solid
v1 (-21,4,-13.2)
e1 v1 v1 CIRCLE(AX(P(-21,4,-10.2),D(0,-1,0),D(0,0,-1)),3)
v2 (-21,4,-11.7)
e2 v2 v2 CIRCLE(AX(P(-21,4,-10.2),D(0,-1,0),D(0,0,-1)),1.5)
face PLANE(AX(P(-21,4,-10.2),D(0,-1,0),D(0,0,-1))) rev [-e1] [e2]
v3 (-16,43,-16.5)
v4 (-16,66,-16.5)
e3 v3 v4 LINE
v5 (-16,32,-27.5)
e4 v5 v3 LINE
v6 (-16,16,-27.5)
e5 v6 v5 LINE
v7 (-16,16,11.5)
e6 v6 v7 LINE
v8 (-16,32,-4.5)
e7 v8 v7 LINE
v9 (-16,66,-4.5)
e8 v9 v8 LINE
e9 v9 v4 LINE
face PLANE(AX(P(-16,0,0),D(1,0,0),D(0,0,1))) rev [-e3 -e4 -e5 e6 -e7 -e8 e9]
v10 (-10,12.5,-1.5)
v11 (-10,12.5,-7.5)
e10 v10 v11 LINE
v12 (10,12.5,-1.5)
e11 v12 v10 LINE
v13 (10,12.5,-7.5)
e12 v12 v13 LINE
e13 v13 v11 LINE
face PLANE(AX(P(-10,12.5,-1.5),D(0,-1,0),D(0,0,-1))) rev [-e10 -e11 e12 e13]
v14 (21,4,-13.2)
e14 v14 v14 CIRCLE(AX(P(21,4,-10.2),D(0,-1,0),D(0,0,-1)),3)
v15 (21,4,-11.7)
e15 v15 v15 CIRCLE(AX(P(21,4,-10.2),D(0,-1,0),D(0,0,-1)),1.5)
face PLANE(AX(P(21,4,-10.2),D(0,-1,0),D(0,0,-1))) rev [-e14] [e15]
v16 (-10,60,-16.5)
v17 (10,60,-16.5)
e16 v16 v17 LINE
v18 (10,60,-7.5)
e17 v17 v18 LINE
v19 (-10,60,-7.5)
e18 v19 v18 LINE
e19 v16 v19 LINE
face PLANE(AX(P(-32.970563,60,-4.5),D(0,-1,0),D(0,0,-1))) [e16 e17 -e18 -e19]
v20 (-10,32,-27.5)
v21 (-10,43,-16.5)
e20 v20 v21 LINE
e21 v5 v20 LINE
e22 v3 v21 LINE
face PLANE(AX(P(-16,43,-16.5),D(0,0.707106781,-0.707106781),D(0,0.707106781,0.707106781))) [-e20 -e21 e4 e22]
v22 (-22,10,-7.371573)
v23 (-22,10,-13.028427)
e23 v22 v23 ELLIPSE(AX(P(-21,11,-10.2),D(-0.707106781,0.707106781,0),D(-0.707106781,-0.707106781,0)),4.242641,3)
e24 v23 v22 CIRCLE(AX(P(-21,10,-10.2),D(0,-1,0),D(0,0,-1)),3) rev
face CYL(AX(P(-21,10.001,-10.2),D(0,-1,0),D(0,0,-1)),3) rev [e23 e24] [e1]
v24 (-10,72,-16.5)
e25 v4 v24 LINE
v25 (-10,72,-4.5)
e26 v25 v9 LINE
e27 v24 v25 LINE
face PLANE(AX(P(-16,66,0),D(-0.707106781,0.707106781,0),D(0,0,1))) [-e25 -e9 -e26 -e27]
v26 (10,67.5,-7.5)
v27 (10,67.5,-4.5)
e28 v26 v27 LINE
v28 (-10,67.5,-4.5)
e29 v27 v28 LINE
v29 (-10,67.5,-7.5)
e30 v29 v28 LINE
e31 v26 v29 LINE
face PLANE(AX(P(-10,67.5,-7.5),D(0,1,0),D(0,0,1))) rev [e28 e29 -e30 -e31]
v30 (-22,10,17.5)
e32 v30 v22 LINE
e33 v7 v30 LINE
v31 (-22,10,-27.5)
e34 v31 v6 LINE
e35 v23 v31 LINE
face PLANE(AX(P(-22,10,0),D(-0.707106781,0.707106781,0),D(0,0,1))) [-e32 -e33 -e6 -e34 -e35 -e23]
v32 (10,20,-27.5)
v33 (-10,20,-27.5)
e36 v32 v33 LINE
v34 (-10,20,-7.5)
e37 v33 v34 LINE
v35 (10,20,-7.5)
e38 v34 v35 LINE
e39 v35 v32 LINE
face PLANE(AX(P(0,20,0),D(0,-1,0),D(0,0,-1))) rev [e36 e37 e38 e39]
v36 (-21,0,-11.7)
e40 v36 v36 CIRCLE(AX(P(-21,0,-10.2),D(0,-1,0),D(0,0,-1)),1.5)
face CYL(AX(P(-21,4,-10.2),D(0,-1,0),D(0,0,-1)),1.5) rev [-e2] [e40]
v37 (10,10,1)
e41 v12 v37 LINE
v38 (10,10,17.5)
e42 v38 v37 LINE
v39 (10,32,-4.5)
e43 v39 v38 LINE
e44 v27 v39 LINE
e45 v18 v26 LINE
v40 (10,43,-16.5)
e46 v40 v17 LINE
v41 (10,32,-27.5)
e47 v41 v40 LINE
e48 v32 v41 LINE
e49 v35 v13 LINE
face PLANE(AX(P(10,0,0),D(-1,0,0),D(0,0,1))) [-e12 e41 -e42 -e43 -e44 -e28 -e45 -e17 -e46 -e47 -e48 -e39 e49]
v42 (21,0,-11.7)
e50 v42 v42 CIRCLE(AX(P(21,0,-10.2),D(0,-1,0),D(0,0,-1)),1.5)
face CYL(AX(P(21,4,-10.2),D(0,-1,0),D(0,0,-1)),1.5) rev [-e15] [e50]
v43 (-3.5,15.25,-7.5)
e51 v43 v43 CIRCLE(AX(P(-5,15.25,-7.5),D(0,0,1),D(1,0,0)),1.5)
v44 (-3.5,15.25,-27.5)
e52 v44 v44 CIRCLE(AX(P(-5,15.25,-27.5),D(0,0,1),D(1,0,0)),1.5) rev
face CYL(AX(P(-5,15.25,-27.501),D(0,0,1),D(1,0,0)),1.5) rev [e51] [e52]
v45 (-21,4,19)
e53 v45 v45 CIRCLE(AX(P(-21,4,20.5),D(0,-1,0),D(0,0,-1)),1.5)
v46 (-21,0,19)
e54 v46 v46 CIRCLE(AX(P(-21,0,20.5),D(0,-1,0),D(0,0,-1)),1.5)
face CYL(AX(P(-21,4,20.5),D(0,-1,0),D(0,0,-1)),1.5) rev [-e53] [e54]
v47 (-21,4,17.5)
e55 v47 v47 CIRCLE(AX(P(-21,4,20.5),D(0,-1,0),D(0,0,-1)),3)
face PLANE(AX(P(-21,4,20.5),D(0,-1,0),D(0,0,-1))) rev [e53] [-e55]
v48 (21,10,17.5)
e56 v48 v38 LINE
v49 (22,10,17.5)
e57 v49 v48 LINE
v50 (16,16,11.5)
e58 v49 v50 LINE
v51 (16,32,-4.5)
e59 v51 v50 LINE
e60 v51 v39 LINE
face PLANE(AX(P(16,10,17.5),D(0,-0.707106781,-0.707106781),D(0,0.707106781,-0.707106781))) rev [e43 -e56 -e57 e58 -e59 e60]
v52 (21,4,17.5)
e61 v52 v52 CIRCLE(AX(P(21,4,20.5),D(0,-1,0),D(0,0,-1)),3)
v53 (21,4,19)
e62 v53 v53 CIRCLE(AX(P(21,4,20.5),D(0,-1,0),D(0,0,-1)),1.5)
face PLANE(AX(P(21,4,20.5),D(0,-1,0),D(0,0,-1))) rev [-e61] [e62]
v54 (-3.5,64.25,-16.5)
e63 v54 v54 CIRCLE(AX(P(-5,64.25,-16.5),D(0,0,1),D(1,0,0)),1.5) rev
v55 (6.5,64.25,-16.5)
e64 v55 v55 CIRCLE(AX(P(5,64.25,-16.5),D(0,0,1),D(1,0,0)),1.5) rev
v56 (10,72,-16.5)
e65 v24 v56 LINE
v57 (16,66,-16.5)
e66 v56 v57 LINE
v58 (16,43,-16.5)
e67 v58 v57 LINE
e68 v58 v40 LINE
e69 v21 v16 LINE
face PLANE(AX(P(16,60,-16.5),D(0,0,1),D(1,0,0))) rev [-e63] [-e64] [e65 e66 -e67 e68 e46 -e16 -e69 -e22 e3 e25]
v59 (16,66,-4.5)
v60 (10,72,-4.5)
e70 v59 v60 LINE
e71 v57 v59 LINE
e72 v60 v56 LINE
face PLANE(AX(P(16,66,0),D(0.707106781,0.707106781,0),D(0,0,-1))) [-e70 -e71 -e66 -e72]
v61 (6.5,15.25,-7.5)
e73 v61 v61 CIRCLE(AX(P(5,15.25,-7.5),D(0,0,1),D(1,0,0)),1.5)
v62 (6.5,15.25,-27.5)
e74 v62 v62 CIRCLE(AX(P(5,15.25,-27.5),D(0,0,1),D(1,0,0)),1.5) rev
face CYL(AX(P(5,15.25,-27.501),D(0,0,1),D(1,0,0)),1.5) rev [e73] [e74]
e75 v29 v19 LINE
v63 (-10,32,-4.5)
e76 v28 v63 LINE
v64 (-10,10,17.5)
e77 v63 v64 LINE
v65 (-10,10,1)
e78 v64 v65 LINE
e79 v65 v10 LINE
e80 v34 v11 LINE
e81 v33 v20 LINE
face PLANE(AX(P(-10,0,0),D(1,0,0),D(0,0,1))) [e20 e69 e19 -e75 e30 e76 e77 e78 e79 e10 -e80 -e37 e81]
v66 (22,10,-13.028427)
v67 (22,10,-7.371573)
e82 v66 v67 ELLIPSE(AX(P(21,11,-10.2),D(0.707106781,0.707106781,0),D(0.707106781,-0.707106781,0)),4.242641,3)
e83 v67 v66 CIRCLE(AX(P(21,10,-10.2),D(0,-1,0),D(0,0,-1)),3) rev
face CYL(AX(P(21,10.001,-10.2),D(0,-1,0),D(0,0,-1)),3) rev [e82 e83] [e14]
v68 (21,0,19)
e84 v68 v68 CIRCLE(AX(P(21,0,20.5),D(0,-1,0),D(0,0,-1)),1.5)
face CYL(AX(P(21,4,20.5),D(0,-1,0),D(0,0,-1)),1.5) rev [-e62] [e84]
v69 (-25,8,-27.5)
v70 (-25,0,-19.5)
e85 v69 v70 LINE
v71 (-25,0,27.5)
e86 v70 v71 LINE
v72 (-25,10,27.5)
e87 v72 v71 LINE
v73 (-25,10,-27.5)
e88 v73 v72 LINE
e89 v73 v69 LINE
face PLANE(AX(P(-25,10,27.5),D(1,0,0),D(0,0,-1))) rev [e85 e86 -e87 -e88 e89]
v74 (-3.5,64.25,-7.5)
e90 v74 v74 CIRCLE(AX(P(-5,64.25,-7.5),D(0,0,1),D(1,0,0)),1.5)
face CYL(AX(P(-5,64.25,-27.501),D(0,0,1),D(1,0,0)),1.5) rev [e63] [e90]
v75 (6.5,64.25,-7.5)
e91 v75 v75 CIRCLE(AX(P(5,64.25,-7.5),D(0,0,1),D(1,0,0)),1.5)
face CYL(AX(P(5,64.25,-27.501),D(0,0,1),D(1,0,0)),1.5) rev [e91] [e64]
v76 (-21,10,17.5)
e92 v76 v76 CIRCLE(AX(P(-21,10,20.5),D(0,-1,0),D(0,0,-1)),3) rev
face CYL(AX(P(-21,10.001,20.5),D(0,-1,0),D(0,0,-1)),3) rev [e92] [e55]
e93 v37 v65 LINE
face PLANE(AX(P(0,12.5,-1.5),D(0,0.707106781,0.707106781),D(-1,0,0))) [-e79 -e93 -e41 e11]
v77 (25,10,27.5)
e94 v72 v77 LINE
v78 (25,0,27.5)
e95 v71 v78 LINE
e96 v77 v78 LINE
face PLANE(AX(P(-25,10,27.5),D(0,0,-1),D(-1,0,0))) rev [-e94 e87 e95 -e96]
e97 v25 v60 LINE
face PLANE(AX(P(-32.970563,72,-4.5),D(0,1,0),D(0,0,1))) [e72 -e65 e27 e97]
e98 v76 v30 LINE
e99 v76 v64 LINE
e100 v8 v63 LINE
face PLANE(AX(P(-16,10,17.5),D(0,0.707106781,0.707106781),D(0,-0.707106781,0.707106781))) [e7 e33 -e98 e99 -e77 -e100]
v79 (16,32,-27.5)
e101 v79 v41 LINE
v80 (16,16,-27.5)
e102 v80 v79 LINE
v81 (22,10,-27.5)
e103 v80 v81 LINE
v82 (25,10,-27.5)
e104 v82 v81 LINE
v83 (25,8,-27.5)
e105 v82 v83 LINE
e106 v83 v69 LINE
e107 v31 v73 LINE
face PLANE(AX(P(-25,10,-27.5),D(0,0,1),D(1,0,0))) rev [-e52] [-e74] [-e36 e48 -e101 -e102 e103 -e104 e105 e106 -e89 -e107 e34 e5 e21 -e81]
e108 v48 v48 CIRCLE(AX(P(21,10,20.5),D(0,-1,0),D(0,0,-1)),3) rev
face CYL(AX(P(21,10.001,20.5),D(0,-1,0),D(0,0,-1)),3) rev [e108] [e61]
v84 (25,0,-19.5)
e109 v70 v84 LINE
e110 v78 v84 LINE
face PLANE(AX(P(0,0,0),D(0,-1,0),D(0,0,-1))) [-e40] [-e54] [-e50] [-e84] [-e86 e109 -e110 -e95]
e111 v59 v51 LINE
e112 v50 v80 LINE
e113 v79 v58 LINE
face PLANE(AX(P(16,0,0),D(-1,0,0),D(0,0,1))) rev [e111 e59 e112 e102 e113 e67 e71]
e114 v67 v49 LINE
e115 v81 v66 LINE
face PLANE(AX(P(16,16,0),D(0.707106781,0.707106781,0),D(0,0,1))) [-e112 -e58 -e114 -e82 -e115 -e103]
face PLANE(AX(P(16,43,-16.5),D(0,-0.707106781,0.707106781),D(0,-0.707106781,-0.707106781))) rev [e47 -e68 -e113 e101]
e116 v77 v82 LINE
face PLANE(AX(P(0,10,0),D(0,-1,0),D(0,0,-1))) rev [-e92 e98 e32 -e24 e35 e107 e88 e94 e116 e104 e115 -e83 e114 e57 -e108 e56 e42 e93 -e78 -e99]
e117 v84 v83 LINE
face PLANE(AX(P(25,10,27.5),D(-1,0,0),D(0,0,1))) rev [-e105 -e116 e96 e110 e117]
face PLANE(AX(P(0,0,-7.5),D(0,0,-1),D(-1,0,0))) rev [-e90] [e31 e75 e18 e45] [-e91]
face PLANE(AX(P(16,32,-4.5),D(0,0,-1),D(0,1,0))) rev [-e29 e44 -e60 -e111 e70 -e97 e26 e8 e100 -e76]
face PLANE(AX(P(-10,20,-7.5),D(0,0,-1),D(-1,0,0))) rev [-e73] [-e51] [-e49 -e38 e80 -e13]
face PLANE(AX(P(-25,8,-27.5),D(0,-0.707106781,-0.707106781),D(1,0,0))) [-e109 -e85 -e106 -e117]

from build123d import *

# Parameters (mm, degrees)
SKETCH1_W           = 50
SKETCH1_H           = 55
BOSS_EXTRUDE1_DEPTH = 10
SKETCH2_R           = 1.5
CUT_EXTRUDE1_DEPTH  = 4
CUT_EXTRUDE2_REACH  = 39.646
SKETCH3_R           = 3
SKETCH4_W           = 20
SKETCH4_H           = 20
BOSS_EXTRUDE2_DEPTH = 10
BOSS_EXTRUDE3_DEPTH = 6
SKETCH6_W           = 12
SKETCH6_H           = 12
BOSS_EXTRUDE4_DEPTH = 32
SKETCH7_W           = 20
SKETCH7_H           = 2.5
BOSS_EXTRUDE5_DEPTH = 6
SKETCH8_W           = 20
SKETCH8_H           = 7.5
CUT_EXTRUDE3_DEPTH  = 3
CHAMFER1_SIZE       = 2.5
CUT_EXTRUDE4_REACH  = 85.869
SKETCH9_R           = 1.5
CHAMFER3_SIZE       = 6
CHAMFER4_SIZE       = 8


# Some blends are built 0.0001 mm under size
with BuildPart() as part:
    # Sketch1 → Boss-Extrude1 (new body)
    with BuildSketch(Plane(origin=(0, 0, 0), x_dir=(1, 0, 0), z_dir=(0, 1, 0))):
        Rectangle(SKETCH1_W, SKETCH1_H)
    extrude(amount=BOSS_EXTRUDE1_DEPTH)

    # Sketch2 → Cut-Extrude1 (cut)
    with BuildSketch(Plane.XZ):
        with Locations(Location((-21, 20.5, 0), (0, 0, 270))):
            Circle(SKETCH2_R)
        with Locations(Location((21, 20.5, 0), (0, 0, 270))):
            Circle(SKETCH2_R)
        with Locations(Location((21, -10.2, 0), (0, 0, 270))):
            Circle(SKETCH2_R)
        with Locations(Location((-21, -10.2, 0), (0, 0, 270))):
            Circle(SKETCH2_R)
    extrude(amount=-CUT_EXTRUDE1_DEPTH, mode=Mode.SUBTRACT)

    # Sketch3 → Cut-Extrude2 (cut, up to next)
    with BuildSketch(Plane.XZ.offset(-4), mode=Mode.PRIVATE) as cut_extrude2_sk1:
        with Locations(Location((-21, 20.5, 0), (0, 0, 270))):
            Circle(SKETCH3_R)
    cut_extrude2_tool1 = extrude(cut_extrude2_sk1.sketch, amount=-CUT_EXTRUDE2_REACH, mode=Mode.PRIVATE) & part.part
    # Sketch3 → Cut-Extrude2 (cut, up to next)
    with BuildSketch(Plane.XZ.offset(-4), mode=Mode.PRIVATE) as cut_extrude2_sk2:
        with Locations(Location((21, 20.5, 0), (0, 0, 270))):
            Circle(SKETCH3_R)
    cut_extrude2_tool2 = extrude(cut_extrude2_sk2.sketch, amount=-CUT_EXTRUDE2_REACH, mode=Mode.PRIVATE) & part.part
    # Sketch3 → Cut-Extrude2 (cut, up to next)
    with BuildSketch(Plane.XZ.offset(-4), mode=Mode.PRIVATE) as cut_extrude2_sk3:
        with Locations(Location((21, -10.2, 0), (0, 0, 270))):
            Circle(SKETCH3_R)
    cut_extrude2_tool3 = extrude(cut_extrude2_sk3.sketch, amount=-CUT_EXTRUDE2_REACH, mode=Mode.PRIVATE) & part.part
    # Sketch3 → Cut-Extrude2 (cut, up to next)
    with BuildSketch(Plane.XZ.offset(-4), mode=Mode.PRIVATE) as cut_extrude2_sk4:
        with Locations(Location((-21, -10.2, 0), (0, 0, 270))):
            Circle(SKETCH3_R)
    cut_extrude2_tool4 = extrude(cut_extrude2_sk4.sketch, amount=-CUT_EXTRUDE2_REACH, mode=Mode.PRIVATE) & part.part
    add(cut_extrude2_tool1.solids().sort_by_distance((-21, 4, 20.5))[0], mode=Mode.SUBTRACT)
    add(cut_extrude2_tool2.solids().sort_by_distance((21, 4, 20.5))[0], mode=Mode.SUBTRACT)
    add(cut_extrude2_tool3.solids().sort_by_distance((21, 4, -10.2))[0], mode=Mode.SUBTRACT)
    add(cut_extrude2_tool4.solids().sort_by_distance((-21, 4, -10.2))[0], mode=Mode.SUBTRACT)

    # Sketch4 → Boss-Extrude2 (add)
    with BuildSketch(Plane(origin=(0, 10, 0), x_dir=(1, 0, 0), z_dir=(0, 1, 0))):
        with Locations((0, 17.5)):
            Rectangle(SKETCH4_W, SKETCH4_H)
    extrude(amount=BOSS_EXTRUDE2_DEPTH)

    # Sketch5 → Boss-Extrude3 (add)
    with BuildSketch(Plane(origin=(10, 0, 0), x_dir=(0, 0, -1), z_dir=(1, 0, 0))):
        Polygon((-17.5, 10), (4.5, 32), (4.5, 60), (16.5, 60), (16.5, 43), (27.5, 32), (27.5, 10), align=None)
    boss_extrude3 = extrude(amount=BOSS_EXTRUDE3_DEPTH)

    # Mirror1: Boss-Extrude3 across plane
    add(boss_extrude3.mirror(Plane(origin=(0, 0, 0), x_dir=(0, 0, 1), z_dir=(1, 0, 0))))

    # Sketch6 → Boss-Extrude4 (add)
    with BuildSketch(Plane(origin=(16, 0, 0), x_dir=(0, 0, -1), z_dir=(1, 0, 0))):
        with Locations((10.5, 66)):
            Rectangle(SKETCH6_W, SKETCH6_H)
    extrude(amount=-BOSS_EXTRUDE4_DEPTH)

    # Sketch7 → Boss-Extrude5 (add)
    with BuildSketch(Plane.XY.offset(-7.5)):
        with Locations((0, 11.25)):
            Rectangle(SKETCH7_W, SKETCH7_H)
    extrude(amount=BOSS_EXTRUDE5_DEPTH)

    # Sketch8 → Cut-Extrude3 (cut)
    with BuildSketch(Plane.XY.offset(-4.5)):
        with Locations((0, 63.75)):
            Rectangle(SKETCH8_W, SKETCH8_H)
    extrude(amount=-CUT_EXTRUDE3_DEPTH, mode=Mode.SUBTRACT)

    # Chamfer1
    chamfer1_edges = [part.edges().sort_by_distance(p)[0] for p in [
        (0, 10, -1.5),
    ]]
    chamfer(chamfer1_edges, length=CHAMFER1_SIZE - 0.0001)  # a hair under: the kernel refuses the full size

    # Sketch9 → Cut-Extrude4 (cut, up to next)
    with BuildSketch(Plane.XY.offset(-7.5), mode=Mode.PRIVATE) as cut_extrude4_sk1:
        with Locations((-5, 64.25)):
            Circle(SKETCH9_R)
    cut_extrude4_tool1 = extrude(cut_extrude4_sk1.sketch, amount=-CUT_EXTRUDE4_REACH, mode=Mode.PRIVATE) & part.part
    # Sketch9 → Cut-Extrude4 (cut, up to next)
    with BuildSketch(Plane.XY.offset(-7.5), mode=Mode.PRIVATE) as cut_extrude4_sk2:
        with Locations((5, 64.25)):
            Circle(SKETCH9_R)
    cut_extrude4_tool2 = extrude(cut_extrude4_sk2.sketch, amount=-CUT_EXTRUDE4_REACH, mode=Mode.PRIVATE) & part.part
    # Sketch9 → Cut-Extrude4 (cut, up to next)
    with BuildSketch(Plane.XY.offset(-7.5), mode=Mode.PRIVATE) as cut_extrude4_sk3:
        with Locations((5, 15.25)):
            Circle(SKETCH9_R)
    cut_extrude4_tool3 = extrude(cut_extrude4_sk3.sketch, amount=-CUT_EXTRUDE4_REACH, mode=Mode.PRIVATE) & part.part
    # Sketch9 → Cut-Extrude4 (cut, up to next)
    with BuildSketch(Plane.XY.offset(-7.5), mode=Mode.PRIVATE) as cut_extrude4_sk4:
        with Locations((-5, 15.25)):
            Circle(SKETCH9_R)
    cut_extrude4_tool4 = extrude(cut_extrude4_sk4.sketch, amount=-CUT_EXTRUDE4_REACH, mode=Mode.PRIVATE) & part.part
    add(cut_extrude4_tool1.solids().sort_by_distance((-5, 64.25, -7.5))[0], mode=Mode.SUBTRACT)
    add(cut_extrude4_tool2.solids().sort_by_distance((5, 64.25, -7.5))[0], mode=Mode.SUBTRACT)
    add(cut_extrude4_tool3.solids().sort_by_distance((5, 15.25, -7.5))[0], mode=Mode.SUBTRACT)
    add(cut_extrude4_tool4.solids().sort_by_distance((-5, 15.25, -7.5))[0], mode=Mode.SUBTRACT)

    # Chamfer3
    # the kernel refuses this chamfer: 6 mm, written as the material it adds along each edge
    with BuildSketch(Plane(origin=(16, 10, -27.5), x_dir=(0.9996219169112969, -0.02749587661058649, 0), z_dir=(0, 0, 1))) as chamfer3_piece_1_section:
        Polygon((CHAMFER3_SIZE * 0.999621916911, CHAMFER3_SIZE * 0.0274958766106), (-CHAMFER3_SIZE * 0.0274958766106, CHAMFER3_SIZE * 0.999621916911), (0, 0), align=None)
    chamfer3_piece_1 = extrude(amount=60.430097928, mode=Mode.PRIVATE)
    chamfer3_piece_1 = split(chamfer3_piece_1, bisect_by=Plane(origin=(17.926096491, 22.613963147, 4.886036853), z_dir=(0, -0.7071067811865474, -0.7071067811865478)), keep=Keep.TOP, mode=Mode.PRIVATE)
    chamfer3_piece_1 = chamfer3_piece_1 - Plane(origin=(21, 11.966350777, 20.5), x_dir=(0, 0, -1), z_dir=(0, -1, 0)) * Cylinder(3, 145, mode=Mode.PRIVATE)
    chamfer3_piece_1 = chamfer3_piece_1 - Plane(origin=(21, 11.966350777, -10.2), x_dir=(0, 0, -1), z_dir=(0, -1, 0)) * Cylinder(3, 145, mode=Mode.PRIVATE)
    add(chamfer3_piece_1)
    with BuildSketch(Plane(origin=(-16, 10, -27.5), x_dir=(-0.9996219169112969, -0.02749587661058649, 0), z_dir=(0, 0, 1))) as chamfer3_piece_2_section:
        Polygon((CHAMFER3_SIZE * 0.999621916911, -CHAMFER3_SIZE * 0.0274958766106), (-CHAMFER3_SIZE * 0.0274958766106, -CHAMFER3_SIZE * 0.999621916911), (0, 0), align=None)
    chamfer3_piece_2 = extrude(amount=60.430097928, mode=Mode.PRIVATE)
    chamfer3_piece_2 = split(chamfer3_piece_2, bisect_by=Plane(origin=(-17.926096431, 22.613963068, 4.886036932), z_dir=(0, -0.7071067811865474, -0.7071067811865478)), keep=Keep.TOP, mode=Mode.PRIVATE)
    chamfer3_piece_2 = chamfer3_piece_2 - Plane(origin=(-21, 11.966350831, 20.5), x_dir=(0, 0, -1), z_dir=(0, -1, 0)) * Cylinder(3, 145, mode=Mode.PRIVATE)
    chamfer3_piece_2 = chamfer3_piece_2 - Plane(origin=(-21, 11.966350831, -10.2), x_dir=(0, 0, -1), z_dir=(0, -1, 0)) * Cylinder(3, 145, mode=Mode.PRIVATE)
    add(chamfer3_piece_2)
    # the kernel refuses this chamfer: 6 mm, written as the material it takes off along each edge
    with BuildSketch(Plane(origin=(16, 72, -31.930097928), x_dir=(0.02749587661058648, -0.9996219169112968, 0), z_dir=(0, 0, 1)), Plane(origin=(-16, 72, -31.930097928), x_dir=(0.9996219169112968, 0.027495876610586775, 0), z_dir=(0, 0, 1))) as chamfer3_2_piece_1:
        Polygon((CHAMFER3_SIZE * 0.999621916911, -CHAMFER3_SIZE * 0.0274958766106), (-CHAMFER3_SIZE * 0.0274958766106, -CHAMFER3_SIZE * 0.999621916911), (0, 0), align=None)
    extrude(amount=42.860195856, mode=Mode.SUBTRACT)

    # Chamfer4
    chamfer4_edges = [part.edges().sort_by_distance(p)[0] for p in [
        (0, 0, -27.5),
    ]]
    chamfer(chamfer4_edges, length=CHAMFER4_SIZE)


solid = part.part
